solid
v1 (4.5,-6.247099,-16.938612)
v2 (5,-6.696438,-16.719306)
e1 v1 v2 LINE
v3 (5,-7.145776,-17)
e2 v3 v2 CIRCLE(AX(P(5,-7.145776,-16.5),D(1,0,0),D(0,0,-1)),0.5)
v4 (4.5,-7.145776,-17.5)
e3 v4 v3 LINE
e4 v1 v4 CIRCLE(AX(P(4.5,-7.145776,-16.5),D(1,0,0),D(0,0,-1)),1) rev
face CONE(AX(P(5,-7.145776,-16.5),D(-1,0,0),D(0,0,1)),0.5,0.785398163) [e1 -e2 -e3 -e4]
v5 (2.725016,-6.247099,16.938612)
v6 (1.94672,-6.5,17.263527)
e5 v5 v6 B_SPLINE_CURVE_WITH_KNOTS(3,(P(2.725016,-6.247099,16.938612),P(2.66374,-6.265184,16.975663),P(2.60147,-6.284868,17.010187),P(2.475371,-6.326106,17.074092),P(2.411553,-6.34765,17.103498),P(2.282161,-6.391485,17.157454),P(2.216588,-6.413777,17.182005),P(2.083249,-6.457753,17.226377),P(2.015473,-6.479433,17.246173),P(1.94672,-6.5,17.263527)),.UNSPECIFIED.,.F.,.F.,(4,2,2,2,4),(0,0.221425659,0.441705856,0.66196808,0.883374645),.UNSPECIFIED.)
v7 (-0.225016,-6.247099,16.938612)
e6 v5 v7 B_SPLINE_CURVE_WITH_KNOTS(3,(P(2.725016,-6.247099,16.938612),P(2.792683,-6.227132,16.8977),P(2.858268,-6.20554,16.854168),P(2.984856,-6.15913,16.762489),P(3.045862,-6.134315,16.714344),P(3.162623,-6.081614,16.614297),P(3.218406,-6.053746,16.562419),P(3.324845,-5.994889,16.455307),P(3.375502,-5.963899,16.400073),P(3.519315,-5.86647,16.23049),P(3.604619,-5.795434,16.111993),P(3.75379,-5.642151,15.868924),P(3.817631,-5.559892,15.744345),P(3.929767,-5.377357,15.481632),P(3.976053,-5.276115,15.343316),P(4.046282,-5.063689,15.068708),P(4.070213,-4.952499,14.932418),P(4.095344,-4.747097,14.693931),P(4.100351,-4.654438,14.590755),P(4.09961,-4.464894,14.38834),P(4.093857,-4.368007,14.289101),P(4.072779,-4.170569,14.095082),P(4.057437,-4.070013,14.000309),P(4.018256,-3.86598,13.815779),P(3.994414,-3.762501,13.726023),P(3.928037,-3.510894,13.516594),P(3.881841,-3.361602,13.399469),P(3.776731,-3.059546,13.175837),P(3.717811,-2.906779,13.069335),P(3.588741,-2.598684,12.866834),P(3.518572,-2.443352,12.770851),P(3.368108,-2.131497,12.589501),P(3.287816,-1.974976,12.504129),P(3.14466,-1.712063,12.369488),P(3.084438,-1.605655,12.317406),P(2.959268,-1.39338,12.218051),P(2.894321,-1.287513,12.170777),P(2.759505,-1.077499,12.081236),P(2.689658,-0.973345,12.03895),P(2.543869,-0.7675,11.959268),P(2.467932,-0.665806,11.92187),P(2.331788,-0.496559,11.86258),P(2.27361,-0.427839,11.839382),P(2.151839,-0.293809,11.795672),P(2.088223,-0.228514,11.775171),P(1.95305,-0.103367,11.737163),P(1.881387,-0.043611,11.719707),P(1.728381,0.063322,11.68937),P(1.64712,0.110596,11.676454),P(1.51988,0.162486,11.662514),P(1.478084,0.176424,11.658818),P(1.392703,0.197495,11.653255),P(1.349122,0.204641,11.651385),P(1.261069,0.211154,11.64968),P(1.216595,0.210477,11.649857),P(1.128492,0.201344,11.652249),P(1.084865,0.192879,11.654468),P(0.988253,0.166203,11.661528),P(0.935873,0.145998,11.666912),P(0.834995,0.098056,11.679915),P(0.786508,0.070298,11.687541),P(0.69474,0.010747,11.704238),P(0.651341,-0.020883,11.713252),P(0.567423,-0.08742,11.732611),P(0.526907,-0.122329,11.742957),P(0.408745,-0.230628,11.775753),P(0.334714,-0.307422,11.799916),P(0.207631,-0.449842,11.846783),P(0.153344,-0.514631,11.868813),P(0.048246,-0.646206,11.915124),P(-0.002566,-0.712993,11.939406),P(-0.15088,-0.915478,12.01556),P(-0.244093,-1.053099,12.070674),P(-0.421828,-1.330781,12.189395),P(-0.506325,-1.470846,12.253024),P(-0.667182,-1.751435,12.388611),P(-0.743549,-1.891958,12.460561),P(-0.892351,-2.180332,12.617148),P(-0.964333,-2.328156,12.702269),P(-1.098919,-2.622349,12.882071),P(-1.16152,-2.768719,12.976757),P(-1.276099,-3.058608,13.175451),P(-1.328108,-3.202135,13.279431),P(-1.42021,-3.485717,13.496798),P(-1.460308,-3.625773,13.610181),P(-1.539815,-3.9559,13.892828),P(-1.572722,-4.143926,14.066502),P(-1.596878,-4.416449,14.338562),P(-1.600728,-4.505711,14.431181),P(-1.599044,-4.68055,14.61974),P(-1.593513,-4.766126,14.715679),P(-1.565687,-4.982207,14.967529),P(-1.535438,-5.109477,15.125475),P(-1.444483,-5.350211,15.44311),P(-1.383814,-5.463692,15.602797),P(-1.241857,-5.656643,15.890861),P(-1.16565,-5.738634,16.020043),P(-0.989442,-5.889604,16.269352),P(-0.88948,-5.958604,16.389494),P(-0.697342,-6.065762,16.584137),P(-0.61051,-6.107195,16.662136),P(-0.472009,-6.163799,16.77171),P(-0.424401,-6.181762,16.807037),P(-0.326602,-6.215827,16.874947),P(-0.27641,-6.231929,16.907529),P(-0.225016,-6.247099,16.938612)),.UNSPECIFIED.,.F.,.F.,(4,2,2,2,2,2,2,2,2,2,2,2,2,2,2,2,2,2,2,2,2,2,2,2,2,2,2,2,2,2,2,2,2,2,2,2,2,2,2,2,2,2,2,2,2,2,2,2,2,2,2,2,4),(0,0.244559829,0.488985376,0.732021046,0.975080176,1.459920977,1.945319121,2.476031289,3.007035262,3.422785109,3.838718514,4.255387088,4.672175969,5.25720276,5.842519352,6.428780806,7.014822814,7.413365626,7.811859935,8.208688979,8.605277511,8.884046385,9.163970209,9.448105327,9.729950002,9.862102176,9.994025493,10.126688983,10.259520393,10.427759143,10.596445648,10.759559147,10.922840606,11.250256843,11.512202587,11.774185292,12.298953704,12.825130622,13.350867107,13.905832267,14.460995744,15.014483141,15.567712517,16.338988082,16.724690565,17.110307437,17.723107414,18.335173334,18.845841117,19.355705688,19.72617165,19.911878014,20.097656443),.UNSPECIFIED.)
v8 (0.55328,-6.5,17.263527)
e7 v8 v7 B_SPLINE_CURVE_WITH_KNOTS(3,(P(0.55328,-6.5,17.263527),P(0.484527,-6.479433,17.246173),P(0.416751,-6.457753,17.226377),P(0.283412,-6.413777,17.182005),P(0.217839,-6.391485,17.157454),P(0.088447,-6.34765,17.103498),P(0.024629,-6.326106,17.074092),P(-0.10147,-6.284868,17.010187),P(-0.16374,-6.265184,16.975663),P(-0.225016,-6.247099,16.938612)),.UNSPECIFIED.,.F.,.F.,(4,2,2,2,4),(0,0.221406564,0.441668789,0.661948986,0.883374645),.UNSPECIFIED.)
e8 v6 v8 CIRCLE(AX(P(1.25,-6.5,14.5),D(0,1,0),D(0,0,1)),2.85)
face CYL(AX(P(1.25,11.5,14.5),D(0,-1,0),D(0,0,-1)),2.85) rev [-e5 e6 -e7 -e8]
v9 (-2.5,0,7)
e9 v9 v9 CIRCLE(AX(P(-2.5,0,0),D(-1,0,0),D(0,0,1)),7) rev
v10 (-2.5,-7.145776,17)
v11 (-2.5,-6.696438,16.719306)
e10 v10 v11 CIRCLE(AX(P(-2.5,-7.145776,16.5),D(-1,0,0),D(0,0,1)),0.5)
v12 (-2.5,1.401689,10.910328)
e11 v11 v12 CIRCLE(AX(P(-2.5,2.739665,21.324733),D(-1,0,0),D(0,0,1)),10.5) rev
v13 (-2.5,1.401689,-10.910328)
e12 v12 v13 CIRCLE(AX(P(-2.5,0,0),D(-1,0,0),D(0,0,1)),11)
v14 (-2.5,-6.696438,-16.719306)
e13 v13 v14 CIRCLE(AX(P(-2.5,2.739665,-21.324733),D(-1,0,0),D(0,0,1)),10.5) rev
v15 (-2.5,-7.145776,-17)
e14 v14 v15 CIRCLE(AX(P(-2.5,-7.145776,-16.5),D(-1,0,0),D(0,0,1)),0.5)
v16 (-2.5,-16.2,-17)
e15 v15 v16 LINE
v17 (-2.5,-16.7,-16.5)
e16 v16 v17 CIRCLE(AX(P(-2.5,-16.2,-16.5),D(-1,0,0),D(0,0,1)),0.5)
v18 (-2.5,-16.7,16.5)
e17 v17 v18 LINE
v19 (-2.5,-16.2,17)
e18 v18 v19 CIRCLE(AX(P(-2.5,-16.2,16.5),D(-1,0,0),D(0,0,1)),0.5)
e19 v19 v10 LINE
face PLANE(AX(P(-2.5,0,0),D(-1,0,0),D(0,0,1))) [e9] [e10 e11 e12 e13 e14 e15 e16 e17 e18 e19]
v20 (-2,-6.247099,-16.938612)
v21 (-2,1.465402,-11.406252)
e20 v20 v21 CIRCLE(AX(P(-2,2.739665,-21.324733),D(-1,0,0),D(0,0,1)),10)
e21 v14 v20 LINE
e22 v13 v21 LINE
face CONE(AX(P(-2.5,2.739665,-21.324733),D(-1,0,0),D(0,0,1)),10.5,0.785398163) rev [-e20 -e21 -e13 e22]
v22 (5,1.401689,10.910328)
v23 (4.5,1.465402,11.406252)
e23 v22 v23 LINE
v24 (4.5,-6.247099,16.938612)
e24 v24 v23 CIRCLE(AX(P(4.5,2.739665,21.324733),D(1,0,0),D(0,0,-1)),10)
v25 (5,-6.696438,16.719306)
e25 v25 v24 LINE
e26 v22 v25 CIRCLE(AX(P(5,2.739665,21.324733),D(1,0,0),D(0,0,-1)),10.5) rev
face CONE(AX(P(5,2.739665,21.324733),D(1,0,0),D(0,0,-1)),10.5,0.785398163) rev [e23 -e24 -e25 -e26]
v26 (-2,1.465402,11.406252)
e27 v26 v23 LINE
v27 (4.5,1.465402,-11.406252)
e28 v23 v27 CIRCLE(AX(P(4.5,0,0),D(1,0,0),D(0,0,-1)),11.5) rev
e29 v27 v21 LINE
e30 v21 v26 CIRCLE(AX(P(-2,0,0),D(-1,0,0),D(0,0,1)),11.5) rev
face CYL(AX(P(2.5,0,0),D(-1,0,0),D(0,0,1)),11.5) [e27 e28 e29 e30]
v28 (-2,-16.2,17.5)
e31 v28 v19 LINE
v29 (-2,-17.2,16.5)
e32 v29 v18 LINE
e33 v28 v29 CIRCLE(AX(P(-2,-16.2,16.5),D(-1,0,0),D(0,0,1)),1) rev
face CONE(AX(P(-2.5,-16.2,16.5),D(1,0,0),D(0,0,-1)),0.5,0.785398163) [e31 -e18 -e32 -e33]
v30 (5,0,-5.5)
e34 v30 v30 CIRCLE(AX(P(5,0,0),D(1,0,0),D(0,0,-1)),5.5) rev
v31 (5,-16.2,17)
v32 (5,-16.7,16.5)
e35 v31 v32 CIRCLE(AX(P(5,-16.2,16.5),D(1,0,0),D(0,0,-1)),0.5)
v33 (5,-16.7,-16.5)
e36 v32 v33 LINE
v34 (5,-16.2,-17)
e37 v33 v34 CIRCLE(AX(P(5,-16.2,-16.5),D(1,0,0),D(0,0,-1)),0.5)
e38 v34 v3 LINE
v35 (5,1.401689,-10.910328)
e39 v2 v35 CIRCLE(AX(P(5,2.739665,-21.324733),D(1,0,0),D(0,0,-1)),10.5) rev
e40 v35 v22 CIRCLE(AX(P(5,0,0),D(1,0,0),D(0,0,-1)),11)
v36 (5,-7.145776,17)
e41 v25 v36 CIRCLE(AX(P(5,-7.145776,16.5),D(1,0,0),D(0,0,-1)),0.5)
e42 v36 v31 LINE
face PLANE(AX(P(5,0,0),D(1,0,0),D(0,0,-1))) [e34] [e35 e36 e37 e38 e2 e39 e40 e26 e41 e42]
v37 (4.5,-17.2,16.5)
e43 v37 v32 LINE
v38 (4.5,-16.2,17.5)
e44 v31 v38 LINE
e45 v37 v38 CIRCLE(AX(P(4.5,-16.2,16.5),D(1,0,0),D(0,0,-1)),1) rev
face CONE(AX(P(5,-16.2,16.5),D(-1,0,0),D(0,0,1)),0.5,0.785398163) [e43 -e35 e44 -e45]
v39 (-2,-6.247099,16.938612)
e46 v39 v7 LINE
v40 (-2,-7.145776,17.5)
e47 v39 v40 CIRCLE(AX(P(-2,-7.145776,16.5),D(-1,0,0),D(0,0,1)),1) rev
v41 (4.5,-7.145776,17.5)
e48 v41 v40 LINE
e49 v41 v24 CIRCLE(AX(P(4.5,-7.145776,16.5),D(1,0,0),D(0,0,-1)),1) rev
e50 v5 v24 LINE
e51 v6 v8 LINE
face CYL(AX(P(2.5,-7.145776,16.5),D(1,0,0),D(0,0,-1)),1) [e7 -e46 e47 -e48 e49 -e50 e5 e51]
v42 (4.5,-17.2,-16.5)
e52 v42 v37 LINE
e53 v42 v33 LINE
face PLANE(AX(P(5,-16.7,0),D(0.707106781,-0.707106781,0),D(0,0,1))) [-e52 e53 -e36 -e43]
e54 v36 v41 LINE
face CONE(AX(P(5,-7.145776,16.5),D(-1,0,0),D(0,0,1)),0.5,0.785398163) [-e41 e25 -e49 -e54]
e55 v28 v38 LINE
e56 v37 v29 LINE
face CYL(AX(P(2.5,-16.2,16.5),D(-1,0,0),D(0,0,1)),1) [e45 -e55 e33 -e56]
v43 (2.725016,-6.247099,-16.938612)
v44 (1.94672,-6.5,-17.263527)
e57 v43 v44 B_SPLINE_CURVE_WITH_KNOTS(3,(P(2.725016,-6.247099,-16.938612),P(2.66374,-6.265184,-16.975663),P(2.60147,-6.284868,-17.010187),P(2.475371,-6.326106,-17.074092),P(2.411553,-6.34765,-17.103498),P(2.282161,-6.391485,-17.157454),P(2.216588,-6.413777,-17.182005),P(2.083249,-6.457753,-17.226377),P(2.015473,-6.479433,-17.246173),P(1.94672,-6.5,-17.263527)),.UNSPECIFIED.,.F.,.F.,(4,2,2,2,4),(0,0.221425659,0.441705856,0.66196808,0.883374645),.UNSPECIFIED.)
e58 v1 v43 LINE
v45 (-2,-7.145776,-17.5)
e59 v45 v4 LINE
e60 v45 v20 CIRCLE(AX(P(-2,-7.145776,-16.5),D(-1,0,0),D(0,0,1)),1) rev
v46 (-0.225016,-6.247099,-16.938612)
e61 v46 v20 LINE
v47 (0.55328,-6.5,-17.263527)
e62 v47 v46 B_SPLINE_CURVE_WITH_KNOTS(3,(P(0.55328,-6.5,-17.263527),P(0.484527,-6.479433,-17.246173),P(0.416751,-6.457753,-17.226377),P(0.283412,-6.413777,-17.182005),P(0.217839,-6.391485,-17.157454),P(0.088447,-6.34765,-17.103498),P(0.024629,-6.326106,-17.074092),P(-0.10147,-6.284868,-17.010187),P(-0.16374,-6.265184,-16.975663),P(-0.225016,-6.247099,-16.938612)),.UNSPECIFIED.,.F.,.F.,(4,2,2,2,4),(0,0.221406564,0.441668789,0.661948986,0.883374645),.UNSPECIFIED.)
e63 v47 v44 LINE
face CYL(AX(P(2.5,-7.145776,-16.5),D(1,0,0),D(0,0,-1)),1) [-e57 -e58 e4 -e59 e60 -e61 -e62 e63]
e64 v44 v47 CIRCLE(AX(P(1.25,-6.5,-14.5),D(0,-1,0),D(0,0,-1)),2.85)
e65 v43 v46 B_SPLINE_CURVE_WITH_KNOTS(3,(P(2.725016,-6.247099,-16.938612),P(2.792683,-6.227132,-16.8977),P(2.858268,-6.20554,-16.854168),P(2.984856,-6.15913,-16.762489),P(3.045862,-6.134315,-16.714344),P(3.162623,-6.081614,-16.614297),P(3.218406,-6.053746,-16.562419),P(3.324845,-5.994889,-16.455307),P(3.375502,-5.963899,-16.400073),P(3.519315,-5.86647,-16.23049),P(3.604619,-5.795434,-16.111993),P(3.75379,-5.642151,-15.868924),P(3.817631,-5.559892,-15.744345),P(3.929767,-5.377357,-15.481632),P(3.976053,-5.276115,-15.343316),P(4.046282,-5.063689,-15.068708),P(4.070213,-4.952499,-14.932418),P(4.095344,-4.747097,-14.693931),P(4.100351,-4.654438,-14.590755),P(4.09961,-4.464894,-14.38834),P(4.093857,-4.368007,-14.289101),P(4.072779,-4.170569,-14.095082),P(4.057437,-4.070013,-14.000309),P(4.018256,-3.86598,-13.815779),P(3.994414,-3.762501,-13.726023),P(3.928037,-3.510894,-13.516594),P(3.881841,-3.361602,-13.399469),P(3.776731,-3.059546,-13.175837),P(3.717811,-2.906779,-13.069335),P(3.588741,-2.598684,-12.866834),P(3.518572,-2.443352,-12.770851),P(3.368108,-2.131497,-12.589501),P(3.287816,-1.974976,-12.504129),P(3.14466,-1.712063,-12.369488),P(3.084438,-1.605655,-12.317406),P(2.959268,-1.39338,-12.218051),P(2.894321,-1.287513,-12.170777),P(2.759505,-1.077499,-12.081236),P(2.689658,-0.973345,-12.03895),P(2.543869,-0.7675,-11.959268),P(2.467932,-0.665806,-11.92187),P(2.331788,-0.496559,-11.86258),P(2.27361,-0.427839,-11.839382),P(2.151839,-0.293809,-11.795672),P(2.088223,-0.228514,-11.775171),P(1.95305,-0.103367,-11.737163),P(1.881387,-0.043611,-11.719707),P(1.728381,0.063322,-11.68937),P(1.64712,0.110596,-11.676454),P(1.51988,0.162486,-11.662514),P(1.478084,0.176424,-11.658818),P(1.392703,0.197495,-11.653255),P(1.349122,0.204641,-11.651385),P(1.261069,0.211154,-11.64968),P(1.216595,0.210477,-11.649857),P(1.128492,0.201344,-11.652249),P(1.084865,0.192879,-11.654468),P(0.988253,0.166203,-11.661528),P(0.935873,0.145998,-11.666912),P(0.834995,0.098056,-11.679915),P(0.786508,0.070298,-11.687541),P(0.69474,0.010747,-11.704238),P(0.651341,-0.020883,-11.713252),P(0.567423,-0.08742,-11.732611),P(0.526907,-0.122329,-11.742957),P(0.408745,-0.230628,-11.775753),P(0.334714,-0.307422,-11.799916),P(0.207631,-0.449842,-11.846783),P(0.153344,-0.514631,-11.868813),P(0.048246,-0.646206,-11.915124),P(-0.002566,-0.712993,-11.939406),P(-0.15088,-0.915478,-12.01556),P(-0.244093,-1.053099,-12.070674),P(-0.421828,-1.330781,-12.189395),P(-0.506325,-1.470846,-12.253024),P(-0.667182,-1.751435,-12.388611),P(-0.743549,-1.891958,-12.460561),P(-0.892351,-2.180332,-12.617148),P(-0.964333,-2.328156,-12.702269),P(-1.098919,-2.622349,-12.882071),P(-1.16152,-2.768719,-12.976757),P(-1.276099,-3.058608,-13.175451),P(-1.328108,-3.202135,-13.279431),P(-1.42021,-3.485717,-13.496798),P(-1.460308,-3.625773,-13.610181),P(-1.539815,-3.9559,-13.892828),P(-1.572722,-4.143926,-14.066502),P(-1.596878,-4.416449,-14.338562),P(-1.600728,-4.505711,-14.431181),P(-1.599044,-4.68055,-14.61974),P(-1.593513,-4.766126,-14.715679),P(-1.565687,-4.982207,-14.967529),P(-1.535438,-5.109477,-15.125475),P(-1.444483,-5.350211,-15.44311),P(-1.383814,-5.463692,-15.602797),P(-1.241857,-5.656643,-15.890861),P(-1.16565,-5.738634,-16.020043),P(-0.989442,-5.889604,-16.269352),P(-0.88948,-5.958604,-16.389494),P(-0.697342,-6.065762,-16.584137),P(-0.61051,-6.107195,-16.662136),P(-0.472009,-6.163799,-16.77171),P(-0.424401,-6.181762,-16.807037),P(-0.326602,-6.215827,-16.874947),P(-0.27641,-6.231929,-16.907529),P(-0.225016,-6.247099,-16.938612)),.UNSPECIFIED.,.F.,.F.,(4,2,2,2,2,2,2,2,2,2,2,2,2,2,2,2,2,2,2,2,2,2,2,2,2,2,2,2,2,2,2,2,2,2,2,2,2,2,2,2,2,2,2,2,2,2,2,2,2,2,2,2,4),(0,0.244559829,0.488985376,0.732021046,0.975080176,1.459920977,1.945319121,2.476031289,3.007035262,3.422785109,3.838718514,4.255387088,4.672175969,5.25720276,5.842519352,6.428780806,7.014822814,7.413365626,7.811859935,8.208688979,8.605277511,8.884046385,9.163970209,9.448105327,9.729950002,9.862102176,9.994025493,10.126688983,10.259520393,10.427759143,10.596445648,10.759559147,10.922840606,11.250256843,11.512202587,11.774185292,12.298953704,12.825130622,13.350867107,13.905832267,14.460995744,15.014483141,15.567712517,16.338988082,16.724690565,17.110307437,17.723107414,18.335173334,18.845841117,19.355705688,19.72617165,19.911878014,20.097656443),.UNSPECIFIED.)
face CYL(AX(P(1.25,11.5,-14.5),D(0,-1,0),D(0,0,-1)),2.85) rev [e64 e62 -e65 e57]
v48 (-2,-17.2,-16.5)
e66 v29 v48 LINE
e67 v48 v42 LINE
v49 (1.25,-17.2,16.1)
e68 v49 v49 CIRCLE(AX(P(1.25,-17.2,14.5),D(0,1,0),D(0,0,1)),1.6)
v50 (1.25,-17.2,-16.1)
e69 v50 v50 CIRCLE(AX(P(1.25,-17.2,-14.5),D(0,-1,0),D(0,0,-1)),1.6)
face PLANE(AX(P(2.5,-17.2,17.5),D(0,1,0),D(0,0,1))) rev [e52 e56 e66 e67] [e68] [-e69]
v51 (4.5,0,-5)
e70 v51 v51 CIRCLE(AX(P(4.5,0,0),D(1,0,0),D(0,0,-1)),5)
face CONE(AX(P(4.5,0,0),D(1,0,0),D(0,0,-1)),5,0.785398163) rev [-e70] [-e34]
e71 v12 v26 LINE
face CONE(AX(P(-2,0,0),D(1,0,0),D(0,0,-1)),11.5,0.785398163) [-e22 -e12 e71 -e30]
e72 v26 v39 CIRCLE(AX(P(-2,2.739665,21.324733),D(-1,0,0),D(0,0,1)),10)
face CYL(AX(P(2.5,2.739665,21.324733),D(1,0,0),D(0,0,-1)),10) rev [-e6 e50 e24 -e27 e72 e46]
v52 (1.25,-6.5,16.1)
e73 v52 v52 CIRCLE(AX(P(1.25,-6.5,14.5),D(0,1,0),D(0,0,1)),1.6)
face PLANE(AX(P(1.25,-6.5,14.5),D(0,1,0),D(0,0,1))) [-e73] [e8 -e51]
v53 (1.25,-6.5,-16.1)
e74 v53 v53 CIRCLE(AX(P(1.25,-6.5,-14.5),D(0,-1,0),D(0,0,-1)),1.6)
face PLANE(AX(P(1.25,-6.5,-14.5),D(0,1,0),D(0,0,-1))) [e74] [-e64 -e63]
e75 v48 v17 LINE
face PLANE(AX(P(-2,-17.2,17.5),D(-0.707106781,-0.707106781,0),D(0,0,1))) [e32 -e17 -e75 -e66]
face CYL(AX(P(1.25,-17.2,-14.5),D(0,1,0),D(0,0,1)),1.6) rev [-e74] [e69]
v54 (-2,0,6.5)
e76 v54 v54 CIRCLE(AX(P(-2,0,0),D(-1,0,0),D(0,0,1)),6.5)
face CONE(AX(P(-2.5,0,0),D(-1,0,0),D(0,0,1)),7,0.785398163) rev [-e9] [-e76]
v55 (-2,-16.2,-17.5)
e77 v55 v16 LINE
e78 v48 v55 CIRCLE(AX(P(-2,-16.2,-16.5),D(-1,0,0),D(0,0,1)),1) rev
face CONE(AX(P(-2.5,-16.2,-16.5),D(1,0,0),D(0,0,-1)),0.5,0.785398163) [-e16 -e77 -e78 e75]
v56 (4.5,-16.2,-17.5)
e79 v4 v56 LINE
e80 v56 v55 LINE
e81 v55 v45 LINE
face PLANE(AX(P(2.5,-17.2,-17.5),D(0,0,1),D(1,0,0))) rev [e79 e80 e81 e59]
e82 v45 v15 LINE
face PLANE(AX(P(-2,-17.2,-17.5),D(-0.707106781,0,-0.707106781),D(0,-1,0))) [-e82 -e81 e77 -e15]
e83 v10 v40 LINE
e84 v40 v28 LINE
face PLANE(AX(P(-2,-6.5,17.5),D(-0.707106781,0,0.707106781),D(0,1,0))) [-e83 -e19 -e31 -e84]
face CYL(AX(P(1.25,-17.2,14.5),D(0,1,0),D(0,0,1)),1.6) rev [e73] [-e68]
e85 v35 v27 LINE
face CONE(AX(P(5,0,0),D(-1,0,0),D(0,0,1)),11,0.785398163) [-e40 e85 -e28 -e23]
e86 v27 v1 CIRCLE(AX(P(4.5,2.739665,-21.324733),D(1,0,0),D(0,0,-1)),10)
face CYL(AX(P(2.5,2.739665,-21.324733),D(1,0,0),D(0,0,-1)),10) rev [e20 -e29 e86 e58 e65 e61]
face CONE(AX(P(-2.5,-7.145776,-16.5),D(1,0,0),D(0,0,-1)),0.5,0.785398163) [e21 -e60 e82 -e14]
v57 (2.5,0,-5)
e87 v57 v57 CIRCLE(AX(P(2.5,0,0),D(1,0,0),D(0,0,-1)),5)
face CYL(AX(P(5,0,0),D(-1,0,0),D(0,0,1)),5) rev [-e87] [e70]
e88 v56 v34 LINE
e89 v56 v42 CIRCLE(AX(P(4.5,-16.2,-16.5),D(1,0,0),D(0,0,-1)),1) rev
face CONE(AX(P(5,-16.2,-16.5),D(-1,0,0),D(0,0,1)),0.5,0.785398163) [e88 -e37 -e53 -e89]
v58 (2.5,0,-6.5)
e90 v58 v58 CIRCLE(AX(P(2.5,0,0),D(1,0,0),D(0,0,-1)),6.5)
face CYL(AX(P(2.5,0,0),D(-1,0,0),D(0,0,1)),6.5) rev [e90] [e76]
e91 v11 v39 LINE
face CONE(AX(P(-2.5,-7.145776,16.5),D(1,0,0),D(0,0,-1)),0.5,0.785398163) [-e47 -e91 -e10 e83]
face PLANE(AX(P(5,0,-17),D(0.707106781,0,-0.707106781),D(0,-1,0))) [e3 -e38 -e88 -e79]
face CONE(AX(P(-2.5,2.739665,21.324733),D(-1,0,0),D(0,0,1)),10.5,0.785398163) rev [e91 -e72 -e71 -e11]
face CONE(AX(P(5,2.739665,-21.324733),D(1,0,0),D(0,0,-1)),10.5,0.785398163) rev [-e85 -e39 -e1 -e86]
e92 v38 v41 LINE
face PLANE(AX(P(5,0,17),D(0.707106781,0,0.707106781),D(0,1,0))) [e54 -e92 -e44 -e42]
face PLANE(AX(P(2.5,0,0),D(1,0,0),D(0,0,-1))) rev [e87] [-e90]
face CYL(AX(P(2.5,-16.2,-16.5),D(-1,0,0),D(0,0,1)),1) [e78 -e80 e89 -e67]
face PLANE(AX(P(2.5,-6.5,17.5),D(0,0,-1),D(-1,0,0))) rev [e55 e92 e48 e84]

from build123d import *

# Parameters (mm, degrees)
SKETCH1_R           = 6.5
BOSS_EXTRUDE1_DEPTH = 2.5
BOSS_EXTRUDE2_START = 2.5
SKETCH2_R           = 5
BOSS_EXTRUDE2_DEPTH = 2.5
FILLET1_R           = 10
FILLET2_R           = 1
CHAMFER1_SIZE       = 0.5
SKETCH3_R           = 2.85
CUT_EXTRUDE1_DEPTH  = 26.597851472
SKETCH4_R           = 1.6
CUT_EXTRUDE2_DEPTH  = 26.597851541


with BuildPart() as part:
    # Sketch1 → Boss-Extrude1 (new, symmetric)
    with BuildSketch(Plane(origin=(0, 0, 0), x_dir=(0, 0, -1), z_dir=(1, 0, 0))):
        with BuildLine():
            Line((-9.486832981, -6.5), (-17.5, -6.5))
            Line((-17.5, -6.5), (-17.5, -17.2))
            Line((-17.5, -17.2), (17.5, -17.2))
            Line((17.5, -17.2), (17.5, -6.5))
            Line((17.5, -6.5), (9.486832981, -6.5))
            ThreePointArc((9.486832981, -6.5), (0, 11.5), (-9.486832981, -6.5))
        make_face()
        Circle(SKETCH1_R, mode=Mode.SUBTRACT)
    extrude(amount=BOSS_EXTRUDE1_DEPTH, both=True)

    # Sketch2 → Boss-Extrude2 (add)
    with BuildSketch(Plane(origin=(2.5, 0, 0), x_dir=(0, 0, -1), z_dir=(1, 0, 0)).offset(BOSS_EXTRUDE2_START)):
        with BuildLine():
            Line((-9.486832981, -6.5), (-17.5, -6.5))
            Line((-17.5, -6.5), (-17.5, -17.2))
            Line((-17.5, -17.2), (17.5, -17.2))
            Line((17.5, -17.2), (17.5, -6.5))
            Line((17.5, -6.5), (9.486832981, -6.5))
            ThreePointArc((9.486832981, -6.5), (0, 11.5), (-9.486832981, -6.5))
        make_face()
        Circle(SKETCH2_R, mode=Mode.SUBTRACT)
    extrude(amount=-BOSS_EXTRUDE2_DEPTH)

    # Fillet1
    # the kernel refuses this fillet: 10 mm, written as the material it adds along each edge
    with BuildSketch(Plane(origin=(5, -6.5, 9.486832981), x_dir=(0, 0, 1), z_dir=(-1, 0, 0))) as fillet1_piece_1:
        with BuildLine():
            CenterArc((11.837899914, 9.239665486), FILLET1_R, 187.320893322, 60.192138393)
            Line((1.919419498, 7.965402469), (1.72104989, 7.939917209))
            ThreePointArc((1.72104989, 7.939917209), (1.498721871, 3.852815723), (-0.1649884, 0.113043478))
            Line((-0.1649884, 0.113043478), (0, -0.2))
            ThreePointArc((0, -0.2), (4.00658351, -0.2), (7.936672362, -0.18479331))
            Line((7.936672362, -0.18479331), (8.013167019, 0))
        make_face()
    extrude(amount=7.5)
    with BuildSketch(Plane(origin=(5, -6.5, -9.486832981), x_dir=(0, 0.9721729957330114, -0.23426409534434056), z_dir=(-1, 0, 0))) as fillet1_piece_2:
        with BuildLine():
            CenterArc((11.755748189, 9.343964746), FILLET1_R, 188.938720591, 60.192138393)
            Line((1.877197323, 7.790184587), (1.679626305, 7.759108983))
            ThreePointArc((1.679626305, 7.759108983), (0.744164062, 3.941945112), (-0.194434599, 0.046852819))
            Line((-0.194434599, 0.046852819), (0.071246959, -0.186879295))
            ThreePointArc((0.071246959, -0.186879295), (4.096700126, 0.554440542), (8.122153294, -0.186879295))
            Line((8.122153294, -0.186879295), (8.193400253, 0))
        make_face()
    extrude(amount=7.5)

    # Fillet2
    fillet2_edges = [part.edges().sort_by_distance(p)[0] for p in [
        (1.25, -6.5, -17.5),
        (1.25, -17.2, -17.5),
        (1.25, -17.2, 17.5),
        (1.25, -6.5, 17.5),
    ]]
    fillet(fillet2_edges, radius=FILLET2_R)

    # Chamfer1
    chamfer1_edges = [part.edges().sort_by_distance(p)[0] for p in [
        (-2.5, 0, 6.5),
        (5, 0, 5),
        (-2.5, 11.5, 0),
        (5, 11.5, 0),
        (-2.5, -3.089050017, -13.199089807),
        (5, -3.089050017, 13.199089807),
        (-2.5, -11.672887978, -17.5),
        (5, -11.672887978, -17.5),
        (-2.5, -17.2, 0),
        (-2.5, -11.672887978, 17.5),
        (-2.5, -3.089050017, 13.199089807),
        (-2.5, -6.61597037, 17.348119119),
        (-2.5, -16.907106781, 17.207106781),
        (-2.5, -6.61597037, -17.348119119),
        (-2.5, -16.907106781, -17.207106781),
        (5, -17.2, 0),
        (5, -3.089050017, -13.199089807),
        (5, -11.672887978, 17.5),
        (5, -6.61597037, 17.348119119),
        (5, -16.907106781, 17.207106781),
        (5, -6.61597037, -17.348119119),
        (5, -16.907106781, -17.207106781),
    ]]
    chamfer(chamfer1_edges, length=CHAMFER1_SIZE)

    # Sketch3 → Cut-Extrude1 (cut, through all)
    with BuildSketch(Plane(origin=(0, -6.5, 0), x_dir=(1, 0, 0), z_dir=(0, 1, 0))):
        with Locations((1.25, -14.5)):
            Circle(SKETCH3_R)
    cut_extrude1 = extrude(amount=CUT_EXTRUDE1_DEPTH, mode=Mode.SUBTRACT)

    # Sketch4 → Cut-Extrude2 (cut, through all)
    with BuildSketch(Plane(origin=(0, -6.5, 0), x_dir=(1, 0, 0), z_dir=(0, 1, 0))):
        with Locations(Location((1.25, -14.5, 0), (0, 0, 270))):
            Circle(SKETCH4_R)
    cut_extrude2 = extrude(amount=-CUT_EXTRUDE2_DEPTH, mode=Mode.SUBTRACT)

    # Mirror1: Cut-Extrude1, Cut-Extrude2 across plane
    add(cut_extrude1.mirror(Plane.XY), mode=Mode.SUBTRACT)
    add(cut_extrude2.mirror(Plane.XY), mode=Mode.SUBTRACT)


solid = part.part
